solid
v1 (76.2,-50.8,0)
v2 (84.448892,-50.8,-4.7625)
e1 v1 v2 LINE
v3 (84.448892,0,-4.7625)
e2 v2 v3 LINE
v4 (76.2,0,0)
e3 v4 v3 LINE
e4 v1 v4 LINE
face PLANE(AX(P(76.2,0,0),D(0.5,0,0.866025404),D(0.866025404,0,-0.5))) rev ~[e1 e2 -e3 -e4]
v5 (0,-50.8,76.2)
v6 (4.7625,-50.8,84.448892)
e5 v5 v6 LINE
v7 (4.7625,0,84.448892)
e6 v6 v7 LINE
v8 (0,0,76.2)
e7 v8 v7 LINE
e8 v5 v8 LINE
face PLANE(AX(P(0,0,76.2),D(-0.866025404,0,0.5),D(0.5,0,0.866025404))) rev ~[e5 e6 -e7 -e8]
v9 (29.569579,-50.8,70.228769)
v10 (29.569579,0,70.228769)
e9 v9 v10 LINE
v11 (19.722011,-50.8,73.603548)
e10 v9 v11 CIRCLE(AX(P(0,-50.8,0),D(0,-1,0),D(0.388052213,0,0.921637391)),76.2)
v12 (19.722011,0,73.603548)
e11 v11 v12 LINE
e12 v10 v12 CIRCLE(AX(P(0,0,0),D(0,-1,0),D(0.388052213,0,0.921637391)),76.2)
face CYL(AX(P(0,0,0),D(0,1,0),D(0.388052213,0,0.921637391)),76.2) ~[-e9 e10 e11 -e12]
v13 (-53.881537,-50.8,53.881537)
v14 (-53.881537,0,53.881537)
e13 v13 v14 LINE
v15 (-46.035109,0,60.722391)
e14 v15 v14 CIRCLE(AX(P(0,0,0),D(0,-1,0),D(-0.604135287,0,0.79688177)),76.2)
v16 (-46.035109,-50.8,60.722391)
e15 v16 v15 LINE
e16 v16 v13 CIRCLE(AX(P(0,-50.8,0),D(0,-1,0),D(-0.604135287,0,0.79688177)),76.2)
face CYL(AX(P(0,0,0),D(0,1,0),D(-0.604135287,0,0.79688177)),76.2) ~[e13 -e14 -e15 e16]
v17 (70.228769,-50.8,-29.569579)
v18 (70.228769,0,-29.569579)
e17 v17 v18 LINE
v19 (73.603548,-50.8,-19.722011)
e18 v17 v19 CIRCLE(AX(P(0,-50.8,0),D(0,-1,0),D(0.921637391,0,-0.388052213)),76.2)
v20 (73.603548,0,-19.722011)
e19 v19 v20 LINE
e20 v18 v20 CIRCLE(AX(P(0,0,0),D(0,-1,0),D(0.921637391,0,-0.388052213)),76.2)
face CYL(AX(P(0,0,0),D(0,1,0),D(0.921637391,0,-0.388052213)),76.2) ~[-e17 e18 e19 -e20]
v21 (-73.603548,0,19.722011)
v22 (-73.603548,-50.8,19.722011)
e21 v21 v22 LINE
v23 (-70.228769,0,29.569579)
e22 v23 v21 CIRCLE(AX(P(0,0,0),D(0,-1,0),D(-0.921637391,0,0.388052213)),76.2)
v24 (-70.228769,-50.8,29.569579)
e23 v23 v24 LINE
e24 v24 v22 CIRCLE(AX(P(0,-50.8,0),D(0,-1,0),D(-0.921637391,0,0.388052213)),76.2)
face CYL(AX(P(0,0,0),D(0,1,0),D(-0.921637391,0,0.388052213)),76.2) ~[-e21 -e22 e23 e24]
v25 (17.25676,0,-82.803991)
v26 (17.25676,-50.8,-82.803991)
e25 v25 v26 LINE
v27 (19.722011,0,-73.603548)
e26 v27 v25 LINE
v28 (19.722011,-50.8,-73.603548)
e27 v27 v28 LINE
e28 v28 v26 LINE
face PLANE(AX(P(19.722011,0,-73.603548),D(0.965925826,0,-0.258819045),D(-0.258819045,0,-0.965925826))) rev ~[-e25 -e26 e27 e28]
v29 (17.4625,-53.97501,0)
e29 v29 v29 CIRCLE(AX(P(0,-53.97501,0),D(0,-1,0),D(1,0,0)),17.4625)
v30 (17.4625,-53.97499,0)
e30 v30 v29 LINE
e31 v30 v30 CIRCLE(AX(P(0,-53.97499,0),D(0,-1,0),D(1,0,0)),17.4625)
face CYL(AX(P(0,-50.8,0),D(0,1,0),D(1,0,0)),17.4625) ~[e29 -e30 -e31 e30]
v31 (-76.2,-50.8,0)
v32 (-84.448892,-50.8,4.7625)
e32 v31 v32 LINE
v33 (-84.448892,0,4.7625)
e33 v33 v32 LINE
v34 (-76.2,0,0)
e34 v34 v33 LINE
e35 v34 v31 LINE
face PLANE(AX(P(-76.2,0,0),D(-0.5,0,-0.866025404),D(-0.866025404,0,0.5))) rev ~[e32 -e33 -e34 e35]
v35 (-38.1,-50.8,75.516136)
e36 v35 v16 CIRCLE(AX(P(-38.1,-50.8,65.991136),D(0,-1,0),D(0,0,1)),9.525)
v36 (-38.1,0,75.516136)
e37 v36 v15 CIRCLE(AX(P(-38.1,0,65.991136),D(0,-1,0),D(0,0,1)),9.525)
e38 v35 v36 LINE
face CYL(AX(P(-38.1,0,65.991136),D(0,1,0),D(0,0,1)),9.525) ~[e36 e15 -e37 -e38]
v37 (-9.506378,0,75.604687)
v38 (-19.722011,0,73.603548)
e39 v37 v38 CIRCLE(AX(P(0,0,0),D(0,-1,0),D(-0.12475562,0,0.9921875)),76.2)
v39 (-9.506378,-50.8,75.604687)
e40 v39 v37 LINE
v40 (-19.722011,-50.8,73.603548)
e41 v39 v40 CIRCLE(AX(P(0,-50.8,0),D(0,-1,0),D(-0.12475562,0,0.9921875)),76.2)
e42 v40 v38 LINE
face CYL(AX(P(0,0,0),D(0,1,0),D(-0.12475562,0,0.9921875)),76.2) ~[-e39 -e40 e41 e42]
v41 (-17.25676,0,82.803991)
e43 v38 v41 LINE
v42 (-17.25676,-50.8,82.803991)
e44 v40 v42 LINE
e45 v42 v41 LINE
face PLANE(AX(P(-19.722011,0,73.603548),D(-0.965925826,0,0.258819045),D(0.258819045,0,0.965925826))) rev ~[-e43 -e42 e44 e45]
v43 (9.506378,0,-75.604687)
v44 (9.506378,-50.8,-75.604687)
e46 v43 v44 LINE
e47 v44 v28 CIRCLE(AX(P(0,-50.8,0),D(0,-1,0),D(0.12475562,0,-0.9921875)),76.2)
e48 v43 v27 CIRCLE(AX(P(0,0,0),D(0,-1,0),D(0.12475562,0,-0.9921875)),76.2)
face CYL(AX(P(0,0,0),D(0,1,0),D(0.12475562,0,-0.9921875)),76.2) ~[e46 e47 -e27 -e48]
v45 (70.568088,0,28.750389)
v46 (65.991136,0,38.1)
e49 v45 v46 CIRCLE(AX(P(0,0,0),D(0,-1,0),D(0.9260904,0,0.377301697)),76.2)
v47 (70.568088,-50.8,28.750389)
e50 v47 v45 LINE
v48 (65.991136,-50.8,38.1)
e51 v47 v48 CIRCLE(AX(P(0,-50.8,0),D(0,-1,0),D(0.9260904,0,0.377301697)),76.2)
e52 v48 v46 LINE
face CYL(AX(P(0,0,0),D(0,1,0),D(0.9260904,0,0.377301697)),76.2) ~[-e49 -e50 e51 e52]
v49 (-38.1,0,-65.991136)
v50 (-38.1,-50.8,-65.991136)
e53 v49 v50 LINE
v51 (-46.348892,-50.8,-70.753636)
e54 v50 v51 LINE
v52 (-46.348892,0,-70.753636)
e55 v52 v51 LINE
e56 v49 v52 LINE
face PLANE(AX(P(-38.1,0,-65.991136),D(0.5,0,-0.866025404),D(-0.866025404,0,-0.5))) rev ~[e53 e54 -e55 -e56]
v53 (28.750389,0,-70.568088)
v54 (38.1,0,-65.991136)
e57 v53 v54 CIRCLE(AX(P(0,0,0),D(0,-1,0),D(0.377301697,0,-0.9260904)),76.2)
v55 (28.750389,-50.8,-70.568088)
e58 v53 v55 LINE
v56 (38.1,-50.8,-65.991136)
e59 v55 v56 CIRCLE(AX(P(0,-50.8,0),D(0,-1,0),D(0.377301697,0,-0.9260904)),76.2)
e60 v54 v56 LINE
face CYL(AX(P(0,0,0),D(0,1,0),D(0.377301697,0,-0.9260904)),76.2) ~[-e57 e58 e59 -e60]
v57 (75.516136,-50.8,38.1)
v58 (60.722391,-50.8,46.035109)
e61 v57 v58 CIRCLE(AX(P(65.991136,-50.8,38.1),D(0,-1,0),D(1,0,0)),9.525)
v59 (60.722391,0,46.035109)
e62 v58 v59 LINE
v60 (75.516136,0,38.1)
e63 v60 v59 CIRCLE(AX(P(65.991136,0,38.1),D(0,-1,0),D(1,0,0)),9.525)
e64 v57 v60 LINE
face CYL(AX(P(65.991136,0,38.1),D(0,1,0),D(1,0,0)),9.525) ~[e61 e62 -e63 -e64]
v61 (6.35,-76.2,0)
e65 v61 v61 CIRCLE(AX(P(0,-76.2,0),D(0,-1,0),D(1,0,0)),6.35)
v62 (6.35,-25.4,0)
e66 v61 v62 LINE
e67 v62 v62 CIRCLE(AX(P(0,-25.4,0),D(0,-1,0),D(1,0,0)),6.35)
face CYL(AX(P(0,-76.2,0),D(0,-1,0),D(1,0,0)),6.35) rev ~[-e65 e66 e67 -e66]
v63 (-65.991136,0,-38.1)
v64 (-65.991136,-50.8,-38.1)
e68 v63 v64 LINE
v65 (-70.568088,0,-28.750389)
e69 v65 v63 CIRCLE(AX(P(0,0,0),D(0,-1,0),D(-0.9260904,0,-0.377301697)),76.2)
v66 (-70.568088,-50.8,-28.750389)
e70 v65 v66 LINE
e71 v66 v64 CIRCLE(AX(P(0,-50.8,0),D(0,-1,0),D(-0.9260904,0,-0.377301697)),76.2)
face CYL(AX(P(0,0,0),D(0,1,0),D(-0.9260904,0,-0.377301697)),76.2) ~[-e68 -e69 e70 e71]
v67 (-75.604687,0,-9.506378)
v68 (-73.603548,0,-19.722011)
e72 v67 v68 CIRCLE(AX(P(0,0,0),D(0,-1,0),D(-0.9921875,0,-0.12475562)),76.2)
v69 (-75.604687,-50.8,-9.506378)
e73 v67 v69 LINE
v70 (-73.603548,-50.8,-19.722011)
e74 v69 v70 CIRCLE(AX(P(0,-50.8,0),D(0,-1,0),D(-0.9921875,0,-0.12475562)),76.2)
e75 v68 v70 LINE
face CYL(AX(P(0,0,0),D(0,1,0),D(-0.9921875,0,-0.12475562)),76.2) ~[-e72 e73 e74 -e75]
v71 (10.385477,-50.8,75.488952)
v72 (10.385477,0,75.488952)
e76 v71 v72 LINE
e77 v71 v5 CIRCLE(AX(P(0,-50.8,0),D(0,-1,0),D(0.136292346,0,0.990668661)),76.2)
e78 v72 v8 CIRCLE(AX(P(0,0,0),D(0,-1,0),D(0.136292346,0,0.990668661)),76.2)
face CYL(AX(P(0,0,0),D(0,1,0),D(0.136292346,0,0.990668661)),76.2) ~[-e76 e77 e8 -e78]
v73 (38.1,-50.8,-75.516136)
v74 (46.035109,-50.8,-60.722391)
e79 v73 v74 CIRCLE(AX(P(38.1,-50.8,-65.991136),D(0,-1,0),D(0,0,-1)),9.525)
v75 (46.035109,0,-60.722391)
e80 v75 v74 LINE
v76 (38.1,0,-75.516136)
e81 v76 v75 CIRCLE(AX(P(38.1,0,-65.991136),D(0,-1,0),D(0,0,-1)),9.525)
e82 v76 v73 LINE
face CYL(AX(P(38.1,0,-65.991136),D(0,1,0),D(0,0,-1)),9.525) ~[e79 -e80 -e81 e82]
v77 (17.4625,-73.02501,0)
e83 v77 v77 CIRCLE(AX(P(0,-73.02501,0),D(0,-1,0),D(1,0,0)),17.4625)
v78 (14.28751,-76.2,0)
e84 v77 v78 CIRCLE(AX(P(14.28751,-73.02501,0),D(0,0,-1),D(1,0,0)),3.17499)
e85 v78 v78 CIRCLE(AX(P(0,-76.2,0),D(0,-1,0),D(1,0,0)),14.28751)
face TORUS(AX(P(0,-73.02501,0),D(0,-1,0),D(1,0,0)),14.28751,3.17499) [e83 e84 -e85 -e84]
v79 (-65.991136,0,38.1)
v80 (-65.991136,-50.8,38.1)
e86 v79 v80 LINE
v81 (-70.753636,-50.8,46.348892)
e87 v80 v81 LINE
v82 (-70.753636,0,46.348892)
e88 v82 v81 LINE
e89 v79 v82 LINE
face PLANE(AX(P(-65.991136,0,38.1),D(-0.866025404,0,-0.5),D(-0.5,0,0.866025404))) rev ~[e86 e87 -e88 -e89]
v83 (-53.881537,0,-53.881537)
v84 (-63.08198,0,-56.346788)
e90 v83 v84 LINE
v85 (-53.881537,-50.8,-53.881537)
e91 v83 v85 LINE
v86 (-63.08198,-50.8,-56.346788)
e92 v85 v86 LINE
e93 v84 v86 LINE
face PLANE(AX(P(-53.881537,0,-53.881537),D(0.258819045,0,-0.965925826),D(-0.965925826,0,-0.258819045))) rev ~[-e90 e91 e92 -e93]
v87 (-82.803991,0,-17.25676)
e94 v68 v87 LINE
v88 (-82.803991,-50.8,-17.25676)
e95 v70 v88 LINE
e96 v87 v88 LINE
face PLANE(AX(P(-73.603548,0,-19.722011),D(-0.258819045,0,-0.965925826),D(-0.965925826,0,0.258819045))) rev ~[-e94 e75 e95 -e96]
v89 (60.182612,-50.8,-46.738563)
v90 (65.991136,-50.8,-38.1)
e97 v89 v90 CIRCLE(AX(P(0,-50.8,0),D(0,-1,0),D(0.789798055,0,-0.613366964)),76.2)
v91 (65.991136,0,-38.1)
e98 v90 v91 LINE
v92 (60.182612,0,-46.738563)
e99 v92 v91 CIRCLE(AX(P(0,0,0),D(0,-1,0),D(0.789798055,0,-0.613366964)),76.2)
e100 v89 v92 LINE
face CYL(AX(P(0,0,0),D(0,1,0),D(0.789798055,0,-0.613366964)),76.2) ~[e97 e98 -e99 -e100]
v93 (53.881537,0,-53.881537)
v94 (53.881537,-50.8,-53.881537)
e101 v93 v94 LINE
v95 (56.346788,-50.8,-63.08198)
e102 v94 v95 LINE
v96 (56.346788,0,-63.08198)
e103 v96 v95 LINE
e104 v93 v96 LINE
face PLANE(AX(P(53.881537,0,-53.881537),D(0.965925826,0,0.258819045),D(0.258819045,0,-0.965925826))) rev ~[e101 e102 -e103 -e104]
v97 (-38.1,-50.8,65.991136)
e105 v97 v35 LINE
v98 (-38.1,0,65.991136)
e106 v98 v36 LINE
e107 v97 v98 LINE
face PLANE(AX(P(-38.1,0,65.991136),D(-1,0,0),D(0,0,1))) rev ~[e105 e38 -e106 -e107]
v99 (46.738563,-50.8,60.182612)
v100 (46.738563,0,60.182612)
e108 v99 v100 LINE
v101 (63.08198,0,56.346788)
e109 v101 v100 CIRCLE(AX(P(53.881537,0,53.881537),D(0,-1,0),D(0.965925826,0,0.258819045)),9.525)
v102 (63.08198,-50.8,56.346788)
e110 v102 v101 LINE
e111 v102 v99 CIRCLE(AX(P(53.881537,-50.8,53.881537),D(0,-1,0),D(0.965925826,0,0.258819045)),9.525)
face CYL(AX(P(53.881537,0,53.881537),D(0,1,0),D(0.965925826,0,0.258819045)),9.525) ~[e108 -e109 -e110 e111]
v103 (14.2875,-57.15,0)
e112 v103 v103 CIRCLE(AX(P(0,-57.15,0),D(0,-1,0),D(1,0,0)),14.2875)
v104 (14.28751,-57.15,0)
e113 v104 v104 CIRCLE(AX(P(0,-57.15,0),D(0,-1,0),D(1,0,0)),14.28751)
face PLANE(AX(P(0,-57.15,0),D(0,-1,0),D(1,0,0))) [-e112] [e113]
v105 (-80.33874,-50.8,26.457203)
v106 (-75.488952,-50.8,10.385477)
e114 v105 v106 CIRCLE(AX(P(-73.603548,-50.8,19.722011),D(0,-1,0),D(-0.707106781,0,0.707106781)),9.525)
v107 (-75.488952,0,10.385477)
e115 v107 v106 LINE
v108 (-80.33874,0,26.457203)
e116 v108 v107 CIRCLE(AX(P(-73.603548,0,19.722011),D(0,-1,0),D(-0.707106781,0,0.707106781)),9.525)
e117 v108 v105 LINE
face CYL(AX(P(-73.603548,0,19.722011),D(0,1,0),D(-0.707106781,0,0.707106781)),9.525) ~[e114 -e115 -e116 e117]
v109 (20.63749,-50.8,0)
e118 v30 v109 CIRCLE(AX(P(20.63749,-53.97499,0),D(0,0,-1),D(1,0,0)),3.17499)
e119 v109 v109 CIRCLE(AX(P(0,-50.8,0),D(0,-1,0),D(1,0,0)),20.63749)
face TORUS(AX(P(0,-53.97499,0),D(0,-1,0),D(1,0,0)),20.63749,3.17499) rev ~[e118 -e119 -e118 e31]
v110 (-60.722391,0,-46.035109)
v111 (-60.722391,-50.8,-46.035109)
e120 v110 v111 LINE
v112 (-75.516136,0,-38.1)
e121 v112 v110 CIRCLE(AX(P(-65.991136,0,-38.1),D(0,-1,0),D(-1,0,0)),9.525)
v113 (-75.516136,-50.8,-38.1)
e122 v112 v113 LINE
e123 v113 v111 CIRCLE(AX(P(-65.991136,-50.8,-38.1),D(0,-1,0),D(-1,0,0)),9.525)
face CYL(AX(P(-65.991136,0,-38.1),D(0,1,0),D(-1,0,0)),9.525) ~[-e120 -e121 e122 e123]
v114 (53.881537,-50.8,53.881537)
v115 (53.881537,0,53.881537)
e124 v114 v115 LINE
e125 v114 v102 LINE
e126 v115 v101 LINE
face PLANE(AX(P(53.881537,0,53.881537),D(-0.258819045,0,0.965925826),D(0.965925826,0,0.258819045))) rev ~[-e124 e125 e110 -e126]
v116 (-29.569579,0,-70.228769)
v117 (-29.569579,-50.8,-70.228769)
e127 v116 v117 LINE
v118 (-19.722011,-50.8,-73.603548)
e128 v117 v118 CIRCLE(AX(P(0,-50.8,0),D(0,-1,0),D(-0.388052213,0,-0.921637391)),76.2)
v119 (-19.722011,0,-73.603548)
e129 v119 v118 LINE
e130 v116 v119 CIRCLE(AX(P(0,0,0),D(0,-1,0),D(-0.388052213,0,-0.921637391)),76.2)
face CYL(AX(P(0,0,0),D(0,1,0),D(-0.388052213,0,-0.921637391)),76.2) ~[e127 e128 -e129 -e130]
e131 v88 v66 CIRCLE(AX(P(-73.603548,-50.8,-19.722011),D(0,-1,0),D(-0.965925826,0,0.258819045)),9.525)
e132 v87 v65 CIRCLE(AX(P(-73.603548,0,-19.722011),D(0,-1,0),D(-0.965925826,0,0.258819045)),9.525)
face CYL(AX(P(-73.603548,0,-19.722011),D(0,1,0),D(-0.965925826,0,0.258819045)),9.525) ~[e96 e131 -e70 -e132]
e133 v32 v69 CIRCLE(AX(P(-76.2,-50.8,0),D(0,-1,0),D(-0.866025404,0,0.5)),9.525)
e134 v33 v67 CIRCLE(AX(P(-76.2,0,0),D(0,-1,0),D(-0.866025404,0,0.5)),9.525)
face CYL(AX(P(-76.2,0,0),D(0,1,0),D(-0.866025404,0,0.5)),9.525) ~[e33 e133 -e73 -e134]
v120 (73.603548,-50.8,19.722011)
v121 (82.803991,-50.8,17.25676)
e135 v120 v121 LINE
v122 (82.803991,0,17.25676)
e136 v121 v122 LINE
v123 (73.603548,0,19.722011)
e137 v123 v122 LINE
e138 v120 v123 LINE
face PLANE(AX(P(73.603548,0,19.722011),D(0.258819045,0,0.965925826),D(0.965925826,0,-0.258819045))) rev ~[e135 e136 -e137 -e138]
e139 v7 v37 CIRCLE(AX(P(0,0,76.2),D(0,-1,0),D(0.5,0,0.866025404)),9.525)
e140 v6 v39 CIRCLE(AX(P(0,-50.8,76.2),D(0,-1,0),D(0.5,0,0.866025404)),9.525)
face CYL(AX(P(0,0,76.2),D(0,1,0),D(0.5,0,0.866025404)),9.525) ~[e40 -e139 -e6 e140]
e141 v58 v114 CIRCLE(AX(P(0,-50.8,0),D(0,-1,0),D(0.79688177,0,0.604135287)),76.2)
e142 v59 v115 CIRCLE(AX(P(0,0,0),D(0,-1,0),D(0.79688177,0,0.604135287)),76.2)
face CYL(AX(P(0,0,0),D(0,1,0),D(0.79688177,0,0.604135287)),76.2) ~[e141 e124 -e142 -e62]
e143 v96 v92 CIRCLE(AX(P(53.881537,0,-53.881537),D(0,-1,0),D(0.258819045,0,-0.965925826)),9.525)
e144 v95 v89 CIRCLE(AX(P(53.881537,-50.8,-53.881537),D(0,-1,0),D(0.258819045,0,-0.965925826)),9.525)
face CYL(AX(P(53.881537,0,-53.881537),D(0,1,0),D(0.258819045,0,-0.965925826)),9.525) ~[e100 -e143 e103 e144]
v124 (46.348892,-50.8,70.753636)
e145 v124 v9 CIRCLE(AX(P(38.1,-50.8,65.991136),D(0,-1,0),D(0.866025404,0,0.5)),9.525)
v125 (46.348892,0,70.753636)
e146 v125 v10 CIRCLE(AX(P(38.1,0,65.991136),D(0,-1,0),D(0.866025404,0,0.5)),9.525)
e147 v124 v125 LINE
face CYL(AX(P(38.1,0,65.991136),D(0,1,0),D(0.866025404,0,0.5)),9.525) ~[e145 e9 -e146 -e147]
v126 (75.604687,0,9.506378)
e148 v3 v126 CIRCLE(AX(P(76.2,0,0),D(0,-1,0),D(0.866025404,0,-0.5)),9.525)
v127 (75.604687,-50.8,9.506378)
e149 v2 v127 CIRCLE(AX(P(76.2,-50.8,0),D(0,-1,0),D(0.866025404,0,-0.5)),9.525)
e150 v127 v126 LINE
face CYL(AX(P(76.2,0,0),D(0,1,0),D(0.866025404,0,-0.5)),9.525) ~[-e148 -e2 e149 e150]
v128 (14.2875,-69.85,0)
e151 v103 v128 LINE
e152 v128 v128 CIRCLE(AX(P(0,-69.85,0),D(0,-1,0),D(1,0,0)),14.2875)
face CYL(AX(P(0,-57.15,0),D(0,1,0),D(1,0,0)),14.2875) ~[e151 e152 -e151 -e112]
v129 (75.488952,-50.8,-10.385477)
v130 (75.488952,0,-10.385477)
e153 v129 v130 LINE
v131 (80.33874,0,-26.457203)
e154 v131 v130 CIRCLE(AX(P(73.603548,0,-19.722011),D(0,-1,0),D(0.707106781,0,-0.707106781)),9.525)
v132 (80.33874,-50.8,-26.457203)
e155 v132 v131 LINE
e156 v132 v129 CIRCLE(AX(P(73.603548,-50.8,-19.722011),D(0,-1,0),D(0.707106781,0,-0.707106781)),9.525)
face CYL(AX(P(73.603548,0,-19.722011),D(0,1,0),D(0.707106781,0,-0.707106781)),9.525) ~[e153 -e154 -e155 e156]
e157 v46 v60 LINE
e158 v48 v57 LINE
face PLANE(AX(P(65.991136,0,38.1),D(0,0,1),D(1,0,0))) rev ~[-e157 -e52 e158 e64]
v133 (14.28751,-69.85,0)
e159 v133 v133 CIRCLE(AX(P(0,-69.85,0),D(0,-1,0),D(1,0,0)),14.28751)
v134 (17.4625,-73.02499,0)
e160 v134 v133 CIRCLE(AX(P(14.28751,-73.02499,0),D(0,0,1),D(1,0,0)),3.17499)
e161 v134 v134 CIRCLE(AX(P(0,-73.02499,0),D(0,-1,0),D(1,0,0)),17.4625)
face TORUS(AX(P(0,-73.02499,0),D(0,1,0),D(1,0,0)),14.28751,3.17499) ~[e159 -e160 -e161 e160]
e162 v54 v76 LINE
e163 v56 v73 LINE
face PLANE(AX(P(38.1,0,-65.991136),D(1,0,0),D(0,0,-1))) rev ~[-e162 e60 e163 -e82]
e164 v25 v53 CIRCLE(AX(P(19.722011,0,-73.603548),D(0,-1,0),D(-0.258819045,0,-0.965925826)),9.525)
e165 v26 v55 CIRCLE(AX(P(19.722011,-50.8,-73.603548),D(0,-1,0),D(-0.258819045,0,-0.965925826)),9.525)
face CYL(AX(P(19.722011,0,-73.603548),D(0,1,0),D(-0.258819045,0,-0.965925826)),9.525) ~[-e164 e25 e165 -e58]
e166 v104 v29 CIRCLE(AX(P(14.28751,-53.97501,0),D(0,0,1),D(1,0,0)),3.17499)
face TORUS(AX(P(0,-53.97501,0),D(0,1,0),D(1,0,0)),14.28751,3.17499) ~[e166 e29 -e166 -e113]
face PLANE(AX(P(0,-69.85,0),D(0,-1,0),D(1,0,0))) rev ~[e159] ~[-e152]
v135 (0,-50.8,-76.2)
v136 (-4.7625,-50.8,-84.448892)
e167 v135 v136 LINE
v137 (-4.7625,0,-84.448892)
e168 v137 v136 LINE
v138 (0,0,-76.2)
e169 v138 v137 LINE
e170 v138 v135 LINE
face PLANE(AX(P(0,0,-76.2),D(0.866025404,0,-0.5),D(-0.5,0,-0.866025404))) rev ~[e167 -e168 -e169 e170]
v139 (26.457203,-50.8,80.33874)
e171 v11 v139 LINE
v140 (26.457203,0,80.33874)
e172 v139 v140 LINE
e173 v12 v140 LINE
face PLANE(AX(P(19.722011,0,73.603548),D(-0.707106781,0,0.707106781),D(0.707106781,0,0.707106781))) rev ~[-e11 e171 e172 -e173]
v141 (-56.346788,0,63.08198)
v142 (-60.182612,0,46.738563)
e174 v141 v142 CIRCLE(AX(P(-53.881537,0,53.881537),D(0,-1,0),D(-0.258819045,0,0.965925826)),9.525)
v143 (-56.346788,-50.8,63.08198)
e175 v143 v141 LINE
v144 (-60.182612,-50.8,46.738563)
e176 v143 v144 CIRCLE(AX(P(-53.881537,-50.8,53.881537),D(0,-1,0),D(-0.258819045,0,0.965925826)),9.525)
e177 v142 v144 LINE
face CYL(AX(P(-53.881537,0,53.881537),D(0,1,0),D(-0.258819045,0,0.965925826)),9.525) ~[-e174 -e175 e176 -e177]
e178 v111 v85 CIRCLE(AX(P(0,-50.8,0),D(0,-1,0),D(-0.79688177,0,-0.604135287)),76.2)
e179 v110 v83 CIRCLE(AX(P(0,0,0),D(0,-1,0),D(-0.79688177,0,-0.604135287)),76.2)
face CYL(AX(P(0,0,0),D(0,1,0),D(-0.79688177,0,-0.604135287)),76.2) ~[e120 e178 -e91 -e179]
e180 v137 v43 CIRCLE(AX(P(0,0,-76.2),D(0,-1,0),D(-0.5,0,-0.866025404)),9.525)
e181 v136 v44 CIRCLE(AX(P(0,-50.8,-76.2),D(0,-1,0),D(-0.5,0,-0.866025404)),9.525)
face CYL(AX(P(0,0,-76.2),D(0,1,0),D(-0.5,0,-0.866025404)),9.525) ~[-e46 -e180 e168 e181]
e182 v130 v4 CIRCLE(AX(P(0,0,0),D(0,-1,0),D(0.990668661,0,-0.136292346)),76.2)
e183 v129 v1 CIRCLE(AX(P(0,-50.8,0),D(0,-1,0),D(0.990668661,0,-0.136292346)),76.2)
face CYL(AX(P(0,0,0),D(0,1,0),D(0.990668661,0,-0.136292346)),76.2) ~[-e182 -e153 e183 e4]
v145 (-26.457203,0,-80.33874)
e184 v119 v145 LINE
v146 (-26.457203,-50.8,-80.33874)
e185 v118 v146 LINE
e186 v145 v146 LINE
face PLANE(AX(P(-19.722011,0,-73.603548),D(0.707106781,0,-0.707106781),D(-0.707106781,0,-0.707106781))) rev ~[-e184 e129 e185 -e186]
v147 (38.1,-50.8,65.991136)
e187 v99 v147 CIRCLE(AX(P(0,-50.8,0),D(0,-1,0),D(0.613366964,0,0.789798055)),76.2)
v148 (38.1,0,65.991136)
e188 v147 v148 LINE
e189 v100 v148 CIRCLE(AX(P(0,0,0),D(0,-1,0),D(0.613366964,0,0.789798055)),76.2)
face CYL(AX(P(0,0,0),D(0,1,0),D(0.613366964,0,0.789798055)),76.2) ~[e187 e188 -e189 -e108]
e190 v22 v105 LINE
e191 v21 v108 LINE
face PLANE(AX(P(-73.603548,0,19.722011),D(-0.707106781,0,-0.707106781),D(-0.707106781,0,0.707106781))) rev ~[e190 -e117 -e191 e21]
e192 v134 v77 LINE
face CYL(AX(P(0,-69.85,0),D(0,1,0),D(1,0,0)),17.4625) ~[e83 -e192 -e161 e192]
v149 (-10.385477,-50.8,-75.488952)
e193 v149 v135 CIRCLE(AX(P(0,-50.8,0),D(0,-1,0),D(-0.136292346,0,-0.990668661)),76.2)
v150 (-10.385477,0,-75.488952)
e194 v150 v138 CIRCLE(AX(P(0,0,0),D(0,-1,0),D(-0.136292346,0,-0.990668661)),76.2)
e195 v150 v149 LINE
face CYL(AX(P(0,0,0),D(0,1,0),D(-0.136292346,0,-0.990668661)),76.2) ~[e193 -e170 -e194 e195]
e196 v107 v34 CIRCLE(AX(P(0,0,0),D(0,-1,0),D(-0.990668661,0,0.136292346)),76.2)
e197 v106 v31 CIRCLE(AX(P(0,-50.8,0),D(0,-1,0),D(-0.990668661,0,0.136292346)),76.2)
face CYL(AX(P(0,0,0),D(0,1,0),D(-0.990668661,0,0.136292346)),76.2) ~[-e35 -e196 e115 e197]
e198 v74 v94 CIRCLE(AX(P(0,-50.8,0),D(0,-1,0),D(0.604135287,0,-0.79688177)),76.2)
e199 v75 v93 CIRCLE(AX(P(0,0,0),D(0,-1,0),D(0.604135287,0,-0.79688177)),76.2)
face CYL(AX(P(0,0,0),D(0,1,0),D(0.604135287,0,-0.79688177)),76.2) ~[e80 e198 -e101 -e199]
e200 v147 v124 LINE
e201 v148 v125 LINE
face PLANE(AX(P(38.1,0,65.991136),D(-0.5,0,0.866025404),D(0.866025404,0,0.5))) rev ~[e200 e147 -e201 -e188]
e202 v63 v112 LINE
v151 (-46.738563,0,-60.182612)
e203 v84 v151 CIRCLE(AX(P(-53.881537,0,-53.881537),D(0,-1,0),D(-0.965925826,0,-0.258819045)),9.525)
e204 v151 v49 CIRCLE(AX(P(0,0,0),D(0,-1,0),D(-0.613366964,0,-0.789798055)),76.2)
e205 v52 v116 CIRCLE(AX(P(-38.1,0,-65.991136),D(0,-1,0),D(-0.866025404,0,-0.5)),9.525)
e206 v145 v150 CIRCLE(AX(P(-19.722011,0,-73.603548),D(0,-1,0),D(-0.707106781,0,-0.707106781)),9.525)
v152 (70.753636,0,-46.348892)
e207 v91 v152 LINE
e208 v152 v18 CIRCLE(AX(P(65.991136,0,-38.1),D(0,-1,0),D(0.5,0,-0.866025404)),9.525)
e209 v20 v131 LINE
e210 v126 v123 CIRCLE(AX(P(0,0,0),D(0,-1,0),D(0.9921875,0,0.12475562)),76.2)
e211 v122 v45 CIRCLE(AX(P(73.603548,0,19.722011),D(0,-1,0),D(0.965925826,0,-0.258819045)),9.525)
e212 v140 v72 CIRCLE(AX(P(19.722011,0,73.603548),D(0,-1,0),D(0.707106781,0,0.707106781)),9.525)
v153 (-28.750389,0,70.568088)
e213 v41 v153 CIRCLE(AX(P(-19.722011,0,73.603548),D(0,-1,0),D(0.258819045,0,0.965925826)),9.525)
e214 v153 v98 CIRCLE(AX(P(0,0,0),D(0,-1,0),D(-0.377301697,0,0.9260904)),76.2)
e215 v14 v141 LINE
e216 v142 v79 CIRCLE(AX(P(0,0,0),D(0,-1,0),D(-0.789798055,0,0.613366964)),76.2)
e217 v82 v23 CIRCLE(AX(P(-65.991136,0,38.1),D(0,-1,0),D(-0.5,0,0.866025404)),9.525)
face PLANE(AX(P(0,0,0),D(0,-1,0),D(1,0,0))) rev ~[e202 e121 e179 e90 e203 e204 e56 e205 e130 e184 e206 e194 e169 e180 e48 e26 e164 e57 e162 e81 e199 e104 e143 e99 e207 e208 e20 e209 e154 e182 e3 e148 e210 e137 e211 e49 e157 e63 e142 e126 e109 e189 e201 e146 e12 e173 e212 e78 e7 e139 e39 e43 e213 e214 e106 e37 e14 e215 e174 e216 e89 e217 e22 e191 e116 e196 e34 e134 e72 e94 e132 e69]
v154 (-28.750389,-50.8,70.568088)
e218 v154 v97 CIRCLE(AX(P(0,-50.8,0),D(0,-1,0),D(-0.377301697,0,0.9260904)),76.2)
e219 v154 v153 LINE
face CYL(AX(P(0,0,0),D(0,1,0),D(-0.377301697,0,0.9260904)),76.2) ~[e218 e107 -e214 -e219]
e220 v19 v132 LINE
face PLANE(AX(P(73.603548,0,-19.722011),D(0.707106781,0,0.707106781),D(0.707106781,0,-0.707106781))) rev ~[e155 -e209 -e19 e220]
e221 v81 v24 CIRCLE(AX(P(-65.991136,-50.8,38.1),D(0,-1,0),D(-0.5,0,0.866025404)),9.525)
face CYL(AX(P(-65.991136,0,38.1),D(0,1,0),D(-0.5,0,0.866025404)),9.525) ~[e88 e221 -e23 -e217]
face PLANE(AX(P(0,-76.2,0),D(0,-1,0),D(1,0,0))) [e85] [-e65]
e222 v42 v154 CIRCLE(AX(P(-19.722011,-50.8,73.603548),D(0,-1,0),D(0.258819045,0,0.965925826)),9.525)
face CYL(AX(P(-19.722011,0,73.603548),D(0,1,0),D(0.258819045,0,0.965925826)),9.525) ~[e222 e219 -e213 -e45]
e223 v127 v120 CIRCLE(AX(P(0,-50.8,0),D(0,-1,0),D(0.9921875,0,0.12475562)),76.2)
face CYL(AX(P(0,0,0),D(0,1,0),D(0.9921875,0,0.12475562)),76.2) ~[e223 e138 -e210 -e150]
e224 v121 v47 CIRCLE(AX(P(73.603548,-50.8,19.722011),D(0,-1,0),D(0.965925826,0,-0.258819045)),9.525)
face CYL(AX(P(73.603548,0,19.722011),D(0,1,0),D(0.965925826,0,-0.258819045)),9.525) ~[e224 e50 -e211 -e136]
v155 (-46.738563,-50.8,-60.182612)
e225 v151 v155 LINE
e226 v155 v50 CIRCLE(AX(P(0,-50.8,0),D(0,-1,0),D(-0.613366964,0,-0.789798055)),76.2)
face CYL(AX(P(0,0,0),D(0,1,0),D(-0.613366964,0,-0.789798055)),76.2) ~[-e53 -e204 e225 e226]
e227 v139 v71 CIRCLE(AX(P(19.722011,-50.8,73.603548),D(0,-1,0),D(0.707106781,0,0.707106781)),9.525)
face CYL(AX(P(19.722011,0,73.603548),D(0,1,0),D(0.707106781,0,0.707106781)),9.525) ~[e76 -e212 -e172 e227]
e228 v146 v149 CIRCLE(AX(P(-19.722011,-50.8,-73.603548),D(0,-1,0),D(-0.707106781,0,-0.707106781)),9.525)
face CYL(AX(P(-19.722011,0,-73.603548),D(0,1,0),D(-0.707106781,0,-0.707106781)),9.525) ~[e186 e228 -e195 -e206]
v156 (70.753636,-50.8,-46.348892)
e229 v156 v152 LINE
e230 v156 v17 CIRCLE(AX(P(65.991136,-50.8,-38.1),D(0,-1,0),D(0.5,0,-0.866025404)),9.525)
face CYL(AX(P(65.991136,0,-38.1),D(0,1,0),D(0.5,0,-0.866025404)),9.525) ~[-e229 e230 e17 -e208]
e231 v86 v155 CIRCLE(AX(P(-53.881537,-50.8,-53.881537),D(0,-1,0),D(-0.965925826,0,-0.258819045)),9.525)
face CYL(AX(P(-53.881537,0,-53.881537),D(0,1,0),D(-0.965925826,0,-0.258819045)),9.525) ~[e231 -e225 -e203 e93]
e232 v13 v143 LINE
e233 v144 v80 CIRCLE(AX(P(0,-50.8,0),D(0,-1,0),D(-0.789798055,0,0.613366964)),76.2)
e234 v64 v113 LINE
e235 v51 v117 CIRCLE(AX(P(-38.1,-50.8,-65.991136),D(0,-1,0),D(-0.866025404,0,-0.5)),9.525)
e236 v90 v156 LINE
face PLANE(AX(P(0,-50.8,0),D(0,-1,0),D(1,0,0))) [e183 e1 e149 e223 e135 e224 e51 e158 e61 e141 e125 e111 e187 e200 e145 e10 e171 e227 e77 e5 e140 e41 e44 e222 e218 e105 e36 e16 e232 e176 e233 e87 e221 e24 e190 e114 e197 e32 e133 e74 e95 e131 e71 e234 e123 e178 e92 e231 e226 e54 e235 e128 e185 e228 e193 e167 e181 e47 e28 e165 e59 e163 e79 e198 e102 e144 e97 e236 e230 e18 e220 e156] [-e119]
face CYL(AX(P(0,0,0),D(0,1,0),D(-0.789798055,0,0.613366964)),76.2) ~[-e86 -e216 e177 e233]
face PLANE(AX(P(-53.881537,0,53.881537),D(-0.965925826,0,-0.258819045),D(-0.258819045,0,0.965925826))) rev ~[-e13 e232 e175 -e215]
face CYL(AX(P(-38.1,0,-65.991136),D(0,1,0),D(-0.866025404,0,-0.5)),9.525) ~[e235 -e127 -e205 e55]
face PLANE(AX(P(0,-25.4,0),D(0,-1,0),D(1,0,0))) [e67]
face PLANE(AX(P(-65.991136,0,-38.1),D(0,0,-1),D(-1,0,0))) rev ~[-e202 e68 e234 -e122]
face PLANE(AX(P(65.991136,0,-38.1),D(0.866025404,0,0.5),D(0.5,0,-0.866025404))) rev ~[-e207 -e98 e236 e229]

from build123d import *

# Parameters (mm, degrees)
F1_DEPTH  = 50.8
F2_R      = 17.4625
F3_DEPTH  = 6.35
F4_R      = 14.2875
F5_DEPTH  = 12.7
F6_R      = 17.4625
F7_DEPTH  = 6.35
F8_R      = 3.17499
F9_R      = 6.35
F10_DEPTH = 76.201
F11_DEPTH = 25.4


# Not quite as in the source:
# - a fillet or chamfer is up to 0.001 mm smaller than in the source, because OpenCascade refuses the exact size


with BuildPart() as f1:
    # F0 (on Front) → F1 (new body)
    with BuildSketch(Plane.XZ):
        with BuildLine():
            ThreePointArc((-56.346788131, 63.0819802218), (-63.1545591102, 56.0579284352), (-60.182611768, 46.7385626735))
            ThreePointArc((-60.182611768, 46.7385626735), (-63.234562014, 42.5185861347), (-65.9911357684, 38.1))
            Line((-65.9911357684, 38.1), (-70.7536357684, 46.348891971))
            ThreePointArc((-70.7536357684, 46.348891971), (-75.5114792005, 37.8021981611), (-70.2287691608, 29.5695786604))
            ThreePointArc((-70.2287691608, 29.5695786604), (-72.0845164259, 24.7034914868), (-73.6035479632, 19.7220112368))
            Line((-73.6035479632, 19.7220112368), (-80.338740054, 26.4572033276))
            ThreePointArc((-80.338740054, 26.4572033276), (-82.7224167718, 16.9703105533), (-75.4889519939, 10.3854767276))
            ThreePointArc((-75.4889519939, 10.3854767276), (-76.0220301687, 5.2048947186), (-76.2, 0))
            Line((-76.2, 0), (-84.448891971, 4.7625))
            ThreePointArc((-84.448891971, 4.7625), (-84.2959583455, -5.0180756738), (-75.6046875, -9.5063782813))
            ThreePointArc((-75.6046875, -9.5063782813), (-74.7787681878, -14.6484070232), (-73.6035479632, -19.7220112368))
            Line((-73.6035479632, -19.7220112368), (-82.8039914586, -17.2567598322))
            ThreePointArc((-82.8039914586, -17.2567598322), (-80.1248696635, -26.6644883366), (-70.5680884956, -28.7503893204))
            ThreePointArc((-70.5680884956, -28.7503893204), (-68.4394567327, -33.503444034), (-65.9911357684, -38.1))
            Line((-65.9911357684, -38.1), (-75.5161357684, -38.1))
            ThreePointArc((-75.5161357684, -38.1), (-70.4934035266, -46.4937601844), (-60.7223908795, -46.0351088396))
            ThreePointArc((-60.7223908795, -46.0351088396), (-57.4361094027, -50.075276701), (-53.8815367264, -53.8815367264))
            Line((-53.8815367264, -53.8815367264), (-63.0819802218, -56.346788131))
            ThreePointArc((-63.0819802218, -56.346788131), (-56.0579284352, -63.1545591102), (-46.7385626735, -60.182611768))
            ThreePointArc((-46.7385626735, -60.182611768), (-42.5185861347, -63.234562014), (-38.1, -65.9911357684))
            Line((-38.1, -65.9911357684), (-46.348891971, -70.7536357684))
            ThreePointArc((-46.348891971, -70.7536357684), (-37.8021981611, -75.5114792005), (-29.5695786604, -70.2287691608))
            ThreePointArc((-29.5695786604, -70.2287691608), (-24.7034914868, -72.0845164259), (-19.7220112368, -73.6035479632))
            Line((-19.7220112368, -73.6035479632), (-26.4572033276, -80.338740054))
            ThreePointArc((-26.4572033276, -80.338740054), (-16.9703105533, -82.7224167718), (-10.3854767276, -75.4889519939))
            ThreePointArc((-10.3854767276, -75.4889519939), (-5.2048947186, -76.0220301687), (0, -76.2))
            Line((0, -76.2), (-4.7625, -84.448891971))
            ThreePointArc((-4.7625, -84.448891971), (5.0180756738, -84.2959583455), (9.5063782813, -75.6046875))
            ThreePointArc((9.5063782813, -75.6046875), (14.6484070232, -74.7787681878), (19.7220112368, -73.6035479632))
            Line((19.7220112368, -73.6035479632), (17.2567598322, -82.8039914586))
            ThreePointArc((17.2567598322, -82.8039914586), (26.6644883366, -80.1248696635), (28.7503893204, -70.5680884956))
            ThreePointArc((28.7503893204, -70.5680884956), (33.503444034, -68.4394567327), (38.1, -65.9911357684))
            Line((38.1, -65.9911357684), (38.1, -75.5161357684))
            ThreePointArc((38.1, -75.5161357684), (46.4937601844, -70.4934035266), (46.0351088396, -60.7223908795))
            ThreePointArc((46.0351088396, -60.7223908795), (50.075276701, -57.4361094027), (53.8815367264, -53.8815367264))
            Line((53.8815367264, -53.8815367264), (56.346788131, -63.0819802218))
            ThreePointArc((56.346788131, -63.0819802218), (63.1545591102, -56.0579284352), (60.182611768, -46.7385626735))
            ThreePointArc((60.182611768, -46.7385626735), (63.234562014, -42.5185861347), (65.9911357684, -38.1))
            Line((65.9911357684, -38.1), (70.7536357684, -46.348891971))
            ThreePointArc((70.7536357684, -46.348891971), (75.5114792005, -37.8021981611), (70.2287691608, -29.5695786604))
            ThreePointArc((70.2287691608, -29.5695786604), (72.0845164259, -24.7034914868), (73.6035479632, -19.7220112368))
            Line((73.6035479632, -19.7220112368), (80.338740054, -26.4572033276))
            ThreePointArc((80.338740054, -26.4572033276), (82.7224167718, -16.9703105533), (75.4889519939, -10.3854767276))
            ThreePointArc((75.4889519939, -10.3854767276), (76.0220301687, -5.2048947186), (76.2, 0))
            Line((76.2, 0), (84.448891971, -4.7625))
            ThreePointArc((84.448891971, -4.7625), (84.2959583455, 5.0180756738), (75.6046875, 9.5063782813))
            ThreePointArc((75.6046875, 9.5063782813), (74.7787681878, 14.6484070232), (73.6035479632, 19.7220112368))
            Line((73.6035479632, 19.7220112368), (82.8039914586, 17.2567598322))
            ThreePointArc((82.8039914586, 17.2567598322), (80.1248696635, 26.6644883366), (70.5680884956, 28.7503893204))
            ThreePointArc((70.5680884956, 28.7503893204), (68.4394567327, 33.503444034), (65.9911357684, 38.1))
            Line((65.9911357684, 38.1), (75.5161357684, 38.1))
            ThreePointArc((75.5161357684, 38.1), (70.4934035266, 46.4937601844), (60.7223908795, 46.0351088396))
            ThreePointArc((60.7223908795, 46.0351088396), (57.4361094027, 50.075276701), (53.8815367264, 53.8815367264))
            Line((53.8815367264, 53.8815367264), (63.0819802218, 56.346788131))
            ThreePointArc((63.0819802218, 56.346788131), (56.0579284352, 63.1545591102), (46.7385626735, 60.182611768))
            ThreePointArc((46.7385626735, 60.182611768), (42.5185861347, 63.234562014), (38.1, 65.9911357684))
            Line((38.1, 65.9911357684), (46.348891971, 70.7536357684))
            ThreePointArc((46.348891971, 70.7536357684), (37.8021981611, 75.5114792005), (29.5695786604, 70.2287691608))
            ThreePointArc((29.5695786604, 70.2287691608), (24.7034914868, 72.0845164259), (19.7220112368, 73.6035479632))
            Line((19.7220112368, 73.6035479632), (26.4572033276, 80.338740054))
            ThreePointArc((26.4572033276, 80.338740054), (16.9703105533, 82.7224167718), (10.3854767276, 75.4889519939))
            ThreePointArc((10.3854767276, 75.4889519939), (5.2048947186, 76.0220301687), (0, 76.2))
            Line((0, 76.2), (4.7625, 84.448891971))
            ThreePointArc((4.7625, 84.448891971), (-5.0180756738, 84.2959583455), (-9.5063782813, 75.6046875))
            ThreePointArc((-9.5063782813, 75.6046875), (-14.6484070232, 74.7787681878), (-19.7220112368, 73.6035479632))
            Line((-19.7220112368, 73.6035479632), (-17.2567598322, 82.8039914586))
            ThreePointArc((-17.2567598322, 82.8039914586), (-26.6644883366, 80.1248696635), (-28.7503893204, 70.5680884956))
            ThreePointArc((-28.7503893204, 70.5680884956), (-33.503444034, 68.4394567327), (-38.1, 65.9911357684))
            Line((-38.1, 65.9911357684), (-38.1, 75.5161357684))
            ThreePointArc((-38.1, 75.5161357684), (-46.4937601844, 70.4934035266), (-46.0351088396, 60.7223908795))
            ThreePointArc((-46.0351088396, 60.7223908795), (-50.075276701, 57.4361094027), (-53.8815367264, 53.8815367264))
            Line((-53.8815367264, 53.8815367264), (-56.346788131, 63.0819802218))
        make_face()
    extrude(amount=F1_DEPTH)

    # F2 (on face) → F3 (join)
    with BuildSketch(Plane.XZ.offset(50.8)):
        Circle(F2_R)
    extrude(amount=F3_DEPTH)

    # F4 (on face) → F5 (join)
    with BuildSketch(Plane.XZ.offset(57.15)):
        Circle(F4_R)
    extrude(amount=F5_DEPTH)

    # F6 (on face) → F7 (join)
    with BuildSketch(Plane.XZ.offset(69.85)):
        Circle(F6_R)
    extrude(amount=F7_DEPTH)

    # F8 (radius 3.175 in the source; OpenCascade refuses exactly that, so slightly less here)
    f8_edges = [f1.edges().sort_by_distance(p)[0] for p in [
        (17.4625, -53.975, 0),
        (-17.4625, -50.8, 0),
        (-17.4625, -57.15, 0),
        (17.4625, -73.025, 0),
        (-17.4625, -69.85, 0),
        (-17.4625, -76.2, 0),
    ]]
    fillet(f8_edges, radius=F8_R)

    # F9 (on face) → F10 (cut, through all)
    with BuildSketch(Plane.XZ.offset(76.2)):
        Circle(F9_R)
    extrude(amount=-F10_DEPTH, mode=Mode.SUBTRACT)

    # F0 (on Front) → F11 (join)
    with BuildSketch(Plane.XZ):
        with BuildLine():
            ThreePointArc((-56.346788131, 63.0819802218), (-63.1545591102, 56.0579284352), (-60.182611768, 46.7385626735))
            ThreePointArc((-60.182611768, 46.7385626735), (-63.234562014, 42.5185861347), (-65.9911357684, 38.1))
            Line((-65.9911357684, 38.1), (-70.7536357684, 46.348891971))
            ThreePointArc((-70.7536357684, 46.348891971), (-75.5114792005, 37.8021981611), (-70.2287691608, 29.5695786604))
            ThreePointArc((-70.2287691608, 29.5695786604), (-72.0845164259, 24.7034914868), (-73.6035479632, 19.7220112368))
            Line((-73.6035479632, 19.7220112368), (-80.338740054, 26.4572033276))
            ThreePointArc((-80.338740054, 26.4572033276), (-82.7224167718, 16.9703105533), (-75.4889519939, 10.3854767276))
            ThreePointArc((-75.4889519939, 10.3854767276), (-76.0220301687, 5.2048947186), (-76.2, 0))
            Line((-76.2, 0), (-84.448891971, 4.7625))
            ThreePointArc((-84.448891971, 4.7625), (-84.2959583455, -5.0180756738), (-75.6046875, -9.5063782813))
            ThreePointArc((-75.6046875, -9.5063782813), (-74.7787681878, -14.6484070232), (-73.6035479632, -19.7220112368))
            Line((-73.6035479632, -19.7220112368), (-82.8039914586, -17.2567598322))
            ThreePointArc((-82.8039914586, -17.2567598322), (-80.1248696635, -26.6644883366), (-70.5680884956, -28.7503893204))
            ThreePointArc((-70.5680884956, -28.7503893204), (-68.4394567327, -33.503444034), (-65.9911357684, -38.1))
            Line((-65.9911357684, -38.1), (-75.5161357684, -38.1))
            ThreePointArc((-75.5161357684, -38.1), (-70.4934035266, -46.4937601844), (-60.7223908795, -46.0351088396))
            ThreePointArc((-60.7223908795, -46.0351088396), (-57.4361094027, -50.075276701), (-53.8815367264, -53.8815367264))
            Line((-53.8815367264, -53.8815367264), (-63.0819802218, -56.346788131))
            ThreePointArc((-63.0819802218, -56.346788131), (-56.0579284352, -63.1545591102), (-46.7385626735, -60.182611768))
            ThreePointArc((-46.7385626735, -60.182611768), (-42.5185861347, -63.234562014), (-38.1, -65.9911357684))
            Line((-38.1, -65.9911357684), (-46.348891971, -70.7536357684))
            ThreePointArc((-46.348891971, -70.7536357684), (-37.8021981611, -75.5114792005), (-29.5695786604, -70.2287691608))
            ThreePointArc((-29.5695786604, -70.2287691608), (-24.7034914868, -72.0845164259), (-19.7220112368, -73.6035479632))
            Line((-19.7220112368, -73.6035479632), (-26.4572033276, -80.338740054))
            ThreePointArc((-26.4572033276, -80.338740054), (-16.9703105533, -82.7224167718), (-10.3854767276, -75.4889519939))
            ThreePointArc((-10.3854767276, -75.4889519939), (-5.2048947186, -76.0220301687), (0, -76.2))
            Line((0, -76.2), (-4.7625, -84.448891971))
            ThreePointArc((-4.7625, -84.448891971), (5.0180756738, -84.2959583455), (9.5063782813, -75.6046875))
            ThreePointArc((9.5063782813, -75.6046875), (14.6484070232, -74.7787681878), (19.7220112368, -73.6035479632))
            Line((19.7220112368, -73.6035479632), (17.2567598322, -82.8039914586))
            ThreePointArc((17.2567598322, -82.8039914586), (26.6644883366, -80.1248696635), (28.7503893204, -70.5680884956))
            ThreePointArc((28.7503893204, -70.5680884956), (33.503444034, -68.4394567327), (38.1, -65.9911357684))
            Line((38.1, -65.9911357684), (38.1, -75.5161357684))
            ThreePointArc((38.1, -75.5161357684), (46.4937601844, -70.4934035266), (46.0351088396, -60.7223908795))
            ThreePointArc((46.0351088396, -60.7223908795), (50.075276701, -57.4361094027), (53.8815367264, -53.8815367264))
            Line((53.8815367264, -53.8815367264), (56.346788131, -63.0819802218))
            ThreePointArc((56.346788131, -63.0819802218), (63.1545591102, -56.0579284352), (60.182611768, -46.7385626735))
            ThreePointArc((60.182611768, -46.7385626735), (63.234562014, -42.5185861347), (65.9911357684, -38.1))
            Line((65.9911357684, -38.1), (70.7536357684, -46.348891971))
            ThreePointArc((70.7536357684, -46.348891971), (75.5114792005, -37.8021981611), (70.2287691608, -29.5695786604))
            ThreePointArc((70.2287691608, -29.5695786604), (72.0845164259, -24.7034914868), (73.6035479632, -19.7220112368))
            Line((73.6035479632, -19.7220112368), (80.338740054, -26.4572033276))
            ThreePointArc((80.338740054, -26.4572033276), (82.7224167718, -16.9703105533), (75.4889519939, -10.3854767276))
            ThreePointArc((75.4889519939, -10.3854767276), (76.0220301687, -5.2048947186), (76.2, 0))
            Line((76.2, 0), (84.448891971, -4.7625))
            ThreePointArc((84.448891971, -4.7625), (84.2959583455, 5.0180756738), (75.6046875, 9.5063782813))
            ThreePointArc((75.6046875, 9.5063782813), (74.7787681878, 14.6484070232), (73.6035479632, 19.7220112368))
            Line((73.6035479632, 19.7220112368), (82.8039914586, 17.2567598322))
            ThreePointArc((82.8039914586, 17.2567598322), (80.1248696635, 26.6644883366), (70.5680884956, 28.7503893204))
            ThreePointArc((70.5680884956, 28.7503893204), (68.4394567327, 33.503444034), (65.9911357684, 38.1))
            Line((65.9911357684, 38.1), (75.5161357684, 38.1))
            ThreePointArc((75.5161357684, 38.1), (70.4934035266, 46.4937601844), (60.7223908795, 46.0351088396))
            ThreePointArc((60.7223908795, 46.0351088396), (57.4361094027, 50.075276701), (53.8815367264, 53.8815367264))
            Line((53.8815367264, 53.8815367264), (63.0819802218, 56.346788131))
            ThreePointArc((63.0819802218, 56.346788131), (56.0579284352, 63.1545591102), (46.7385626735, 60.182611768))
            ThreePointArc((46.7385626735, 60.182611768), (42.5185861347, 63.234562014), (38.1, 65.9911357684))
            Line((38.1, 65.9911357684), (46.348891971, 70.7536357684))
            ThreePointArc((46.348891971, 70.7536357684), (37.8021981611, 75.5114792005), (29.5695786604, 70.2287691608))
            ThreePointArc((29.5695786604, 70.2287691608), (24.7034914868, 72.0845164259), (19.7220112368, 73.6035479632))
            Line((19.7220112368, 73.6035479632), (26.4572033276, 80.338740054))
            ThreePointArc((26.4572033276, 80.338740054), (16.9703105533, 82.7224167718), (10.3854767276, 75.4889519939))
            ThreePointArc((10.3854767276, 75.4889519939), (5.2048947186, 76.0220301687), (0, 76.2))
            Line((0, 76.2), (4.7625, 84.448891971))
            ThreePointArc((4.7625, 84.448891971), (-5.0180756738, 84.2959583455), (-9.5063782813, 75.6046875))
            ThreePointArc((-9.5063782813, 75.6046875), (-14.6484070232, 74.7787681878), (-19.7220112368, 73.6035479632))
            Line((-19.7220112368, 73.6035479632), (-17.2567598322, 82.8039914586))
            ThreePointArc((-17.2567598322, 82.8039914586), (-26.6644883366, 80.1248696635), (-28.7503893204, 70.5680884956))
            ThreePointArc((-28.7503893204, 70.5680884956), (-33.503444034, 68.4394567327), (-38.1, 65.9911357684))
            Line((-38.1, 65.9911357684), (-38.1, 75.5161357684))
            ThreePointArc((-38.1, 75.5161357684), (-46.4937601844, 70.4934035266), (-46.0351088396, 60.7223908795))
            ThreePointArc((-46.0351088396, 60.7223908795), (-50.075276701, 57.4361094027), (-53.8815367264, 53.8815367264))
            Line((-53.8815367264, 53.8815367264), (-56.346788131, 63.0819802218))
        make_face()
    extrude(amount=F11_DEPTH)


solid = f1.part
